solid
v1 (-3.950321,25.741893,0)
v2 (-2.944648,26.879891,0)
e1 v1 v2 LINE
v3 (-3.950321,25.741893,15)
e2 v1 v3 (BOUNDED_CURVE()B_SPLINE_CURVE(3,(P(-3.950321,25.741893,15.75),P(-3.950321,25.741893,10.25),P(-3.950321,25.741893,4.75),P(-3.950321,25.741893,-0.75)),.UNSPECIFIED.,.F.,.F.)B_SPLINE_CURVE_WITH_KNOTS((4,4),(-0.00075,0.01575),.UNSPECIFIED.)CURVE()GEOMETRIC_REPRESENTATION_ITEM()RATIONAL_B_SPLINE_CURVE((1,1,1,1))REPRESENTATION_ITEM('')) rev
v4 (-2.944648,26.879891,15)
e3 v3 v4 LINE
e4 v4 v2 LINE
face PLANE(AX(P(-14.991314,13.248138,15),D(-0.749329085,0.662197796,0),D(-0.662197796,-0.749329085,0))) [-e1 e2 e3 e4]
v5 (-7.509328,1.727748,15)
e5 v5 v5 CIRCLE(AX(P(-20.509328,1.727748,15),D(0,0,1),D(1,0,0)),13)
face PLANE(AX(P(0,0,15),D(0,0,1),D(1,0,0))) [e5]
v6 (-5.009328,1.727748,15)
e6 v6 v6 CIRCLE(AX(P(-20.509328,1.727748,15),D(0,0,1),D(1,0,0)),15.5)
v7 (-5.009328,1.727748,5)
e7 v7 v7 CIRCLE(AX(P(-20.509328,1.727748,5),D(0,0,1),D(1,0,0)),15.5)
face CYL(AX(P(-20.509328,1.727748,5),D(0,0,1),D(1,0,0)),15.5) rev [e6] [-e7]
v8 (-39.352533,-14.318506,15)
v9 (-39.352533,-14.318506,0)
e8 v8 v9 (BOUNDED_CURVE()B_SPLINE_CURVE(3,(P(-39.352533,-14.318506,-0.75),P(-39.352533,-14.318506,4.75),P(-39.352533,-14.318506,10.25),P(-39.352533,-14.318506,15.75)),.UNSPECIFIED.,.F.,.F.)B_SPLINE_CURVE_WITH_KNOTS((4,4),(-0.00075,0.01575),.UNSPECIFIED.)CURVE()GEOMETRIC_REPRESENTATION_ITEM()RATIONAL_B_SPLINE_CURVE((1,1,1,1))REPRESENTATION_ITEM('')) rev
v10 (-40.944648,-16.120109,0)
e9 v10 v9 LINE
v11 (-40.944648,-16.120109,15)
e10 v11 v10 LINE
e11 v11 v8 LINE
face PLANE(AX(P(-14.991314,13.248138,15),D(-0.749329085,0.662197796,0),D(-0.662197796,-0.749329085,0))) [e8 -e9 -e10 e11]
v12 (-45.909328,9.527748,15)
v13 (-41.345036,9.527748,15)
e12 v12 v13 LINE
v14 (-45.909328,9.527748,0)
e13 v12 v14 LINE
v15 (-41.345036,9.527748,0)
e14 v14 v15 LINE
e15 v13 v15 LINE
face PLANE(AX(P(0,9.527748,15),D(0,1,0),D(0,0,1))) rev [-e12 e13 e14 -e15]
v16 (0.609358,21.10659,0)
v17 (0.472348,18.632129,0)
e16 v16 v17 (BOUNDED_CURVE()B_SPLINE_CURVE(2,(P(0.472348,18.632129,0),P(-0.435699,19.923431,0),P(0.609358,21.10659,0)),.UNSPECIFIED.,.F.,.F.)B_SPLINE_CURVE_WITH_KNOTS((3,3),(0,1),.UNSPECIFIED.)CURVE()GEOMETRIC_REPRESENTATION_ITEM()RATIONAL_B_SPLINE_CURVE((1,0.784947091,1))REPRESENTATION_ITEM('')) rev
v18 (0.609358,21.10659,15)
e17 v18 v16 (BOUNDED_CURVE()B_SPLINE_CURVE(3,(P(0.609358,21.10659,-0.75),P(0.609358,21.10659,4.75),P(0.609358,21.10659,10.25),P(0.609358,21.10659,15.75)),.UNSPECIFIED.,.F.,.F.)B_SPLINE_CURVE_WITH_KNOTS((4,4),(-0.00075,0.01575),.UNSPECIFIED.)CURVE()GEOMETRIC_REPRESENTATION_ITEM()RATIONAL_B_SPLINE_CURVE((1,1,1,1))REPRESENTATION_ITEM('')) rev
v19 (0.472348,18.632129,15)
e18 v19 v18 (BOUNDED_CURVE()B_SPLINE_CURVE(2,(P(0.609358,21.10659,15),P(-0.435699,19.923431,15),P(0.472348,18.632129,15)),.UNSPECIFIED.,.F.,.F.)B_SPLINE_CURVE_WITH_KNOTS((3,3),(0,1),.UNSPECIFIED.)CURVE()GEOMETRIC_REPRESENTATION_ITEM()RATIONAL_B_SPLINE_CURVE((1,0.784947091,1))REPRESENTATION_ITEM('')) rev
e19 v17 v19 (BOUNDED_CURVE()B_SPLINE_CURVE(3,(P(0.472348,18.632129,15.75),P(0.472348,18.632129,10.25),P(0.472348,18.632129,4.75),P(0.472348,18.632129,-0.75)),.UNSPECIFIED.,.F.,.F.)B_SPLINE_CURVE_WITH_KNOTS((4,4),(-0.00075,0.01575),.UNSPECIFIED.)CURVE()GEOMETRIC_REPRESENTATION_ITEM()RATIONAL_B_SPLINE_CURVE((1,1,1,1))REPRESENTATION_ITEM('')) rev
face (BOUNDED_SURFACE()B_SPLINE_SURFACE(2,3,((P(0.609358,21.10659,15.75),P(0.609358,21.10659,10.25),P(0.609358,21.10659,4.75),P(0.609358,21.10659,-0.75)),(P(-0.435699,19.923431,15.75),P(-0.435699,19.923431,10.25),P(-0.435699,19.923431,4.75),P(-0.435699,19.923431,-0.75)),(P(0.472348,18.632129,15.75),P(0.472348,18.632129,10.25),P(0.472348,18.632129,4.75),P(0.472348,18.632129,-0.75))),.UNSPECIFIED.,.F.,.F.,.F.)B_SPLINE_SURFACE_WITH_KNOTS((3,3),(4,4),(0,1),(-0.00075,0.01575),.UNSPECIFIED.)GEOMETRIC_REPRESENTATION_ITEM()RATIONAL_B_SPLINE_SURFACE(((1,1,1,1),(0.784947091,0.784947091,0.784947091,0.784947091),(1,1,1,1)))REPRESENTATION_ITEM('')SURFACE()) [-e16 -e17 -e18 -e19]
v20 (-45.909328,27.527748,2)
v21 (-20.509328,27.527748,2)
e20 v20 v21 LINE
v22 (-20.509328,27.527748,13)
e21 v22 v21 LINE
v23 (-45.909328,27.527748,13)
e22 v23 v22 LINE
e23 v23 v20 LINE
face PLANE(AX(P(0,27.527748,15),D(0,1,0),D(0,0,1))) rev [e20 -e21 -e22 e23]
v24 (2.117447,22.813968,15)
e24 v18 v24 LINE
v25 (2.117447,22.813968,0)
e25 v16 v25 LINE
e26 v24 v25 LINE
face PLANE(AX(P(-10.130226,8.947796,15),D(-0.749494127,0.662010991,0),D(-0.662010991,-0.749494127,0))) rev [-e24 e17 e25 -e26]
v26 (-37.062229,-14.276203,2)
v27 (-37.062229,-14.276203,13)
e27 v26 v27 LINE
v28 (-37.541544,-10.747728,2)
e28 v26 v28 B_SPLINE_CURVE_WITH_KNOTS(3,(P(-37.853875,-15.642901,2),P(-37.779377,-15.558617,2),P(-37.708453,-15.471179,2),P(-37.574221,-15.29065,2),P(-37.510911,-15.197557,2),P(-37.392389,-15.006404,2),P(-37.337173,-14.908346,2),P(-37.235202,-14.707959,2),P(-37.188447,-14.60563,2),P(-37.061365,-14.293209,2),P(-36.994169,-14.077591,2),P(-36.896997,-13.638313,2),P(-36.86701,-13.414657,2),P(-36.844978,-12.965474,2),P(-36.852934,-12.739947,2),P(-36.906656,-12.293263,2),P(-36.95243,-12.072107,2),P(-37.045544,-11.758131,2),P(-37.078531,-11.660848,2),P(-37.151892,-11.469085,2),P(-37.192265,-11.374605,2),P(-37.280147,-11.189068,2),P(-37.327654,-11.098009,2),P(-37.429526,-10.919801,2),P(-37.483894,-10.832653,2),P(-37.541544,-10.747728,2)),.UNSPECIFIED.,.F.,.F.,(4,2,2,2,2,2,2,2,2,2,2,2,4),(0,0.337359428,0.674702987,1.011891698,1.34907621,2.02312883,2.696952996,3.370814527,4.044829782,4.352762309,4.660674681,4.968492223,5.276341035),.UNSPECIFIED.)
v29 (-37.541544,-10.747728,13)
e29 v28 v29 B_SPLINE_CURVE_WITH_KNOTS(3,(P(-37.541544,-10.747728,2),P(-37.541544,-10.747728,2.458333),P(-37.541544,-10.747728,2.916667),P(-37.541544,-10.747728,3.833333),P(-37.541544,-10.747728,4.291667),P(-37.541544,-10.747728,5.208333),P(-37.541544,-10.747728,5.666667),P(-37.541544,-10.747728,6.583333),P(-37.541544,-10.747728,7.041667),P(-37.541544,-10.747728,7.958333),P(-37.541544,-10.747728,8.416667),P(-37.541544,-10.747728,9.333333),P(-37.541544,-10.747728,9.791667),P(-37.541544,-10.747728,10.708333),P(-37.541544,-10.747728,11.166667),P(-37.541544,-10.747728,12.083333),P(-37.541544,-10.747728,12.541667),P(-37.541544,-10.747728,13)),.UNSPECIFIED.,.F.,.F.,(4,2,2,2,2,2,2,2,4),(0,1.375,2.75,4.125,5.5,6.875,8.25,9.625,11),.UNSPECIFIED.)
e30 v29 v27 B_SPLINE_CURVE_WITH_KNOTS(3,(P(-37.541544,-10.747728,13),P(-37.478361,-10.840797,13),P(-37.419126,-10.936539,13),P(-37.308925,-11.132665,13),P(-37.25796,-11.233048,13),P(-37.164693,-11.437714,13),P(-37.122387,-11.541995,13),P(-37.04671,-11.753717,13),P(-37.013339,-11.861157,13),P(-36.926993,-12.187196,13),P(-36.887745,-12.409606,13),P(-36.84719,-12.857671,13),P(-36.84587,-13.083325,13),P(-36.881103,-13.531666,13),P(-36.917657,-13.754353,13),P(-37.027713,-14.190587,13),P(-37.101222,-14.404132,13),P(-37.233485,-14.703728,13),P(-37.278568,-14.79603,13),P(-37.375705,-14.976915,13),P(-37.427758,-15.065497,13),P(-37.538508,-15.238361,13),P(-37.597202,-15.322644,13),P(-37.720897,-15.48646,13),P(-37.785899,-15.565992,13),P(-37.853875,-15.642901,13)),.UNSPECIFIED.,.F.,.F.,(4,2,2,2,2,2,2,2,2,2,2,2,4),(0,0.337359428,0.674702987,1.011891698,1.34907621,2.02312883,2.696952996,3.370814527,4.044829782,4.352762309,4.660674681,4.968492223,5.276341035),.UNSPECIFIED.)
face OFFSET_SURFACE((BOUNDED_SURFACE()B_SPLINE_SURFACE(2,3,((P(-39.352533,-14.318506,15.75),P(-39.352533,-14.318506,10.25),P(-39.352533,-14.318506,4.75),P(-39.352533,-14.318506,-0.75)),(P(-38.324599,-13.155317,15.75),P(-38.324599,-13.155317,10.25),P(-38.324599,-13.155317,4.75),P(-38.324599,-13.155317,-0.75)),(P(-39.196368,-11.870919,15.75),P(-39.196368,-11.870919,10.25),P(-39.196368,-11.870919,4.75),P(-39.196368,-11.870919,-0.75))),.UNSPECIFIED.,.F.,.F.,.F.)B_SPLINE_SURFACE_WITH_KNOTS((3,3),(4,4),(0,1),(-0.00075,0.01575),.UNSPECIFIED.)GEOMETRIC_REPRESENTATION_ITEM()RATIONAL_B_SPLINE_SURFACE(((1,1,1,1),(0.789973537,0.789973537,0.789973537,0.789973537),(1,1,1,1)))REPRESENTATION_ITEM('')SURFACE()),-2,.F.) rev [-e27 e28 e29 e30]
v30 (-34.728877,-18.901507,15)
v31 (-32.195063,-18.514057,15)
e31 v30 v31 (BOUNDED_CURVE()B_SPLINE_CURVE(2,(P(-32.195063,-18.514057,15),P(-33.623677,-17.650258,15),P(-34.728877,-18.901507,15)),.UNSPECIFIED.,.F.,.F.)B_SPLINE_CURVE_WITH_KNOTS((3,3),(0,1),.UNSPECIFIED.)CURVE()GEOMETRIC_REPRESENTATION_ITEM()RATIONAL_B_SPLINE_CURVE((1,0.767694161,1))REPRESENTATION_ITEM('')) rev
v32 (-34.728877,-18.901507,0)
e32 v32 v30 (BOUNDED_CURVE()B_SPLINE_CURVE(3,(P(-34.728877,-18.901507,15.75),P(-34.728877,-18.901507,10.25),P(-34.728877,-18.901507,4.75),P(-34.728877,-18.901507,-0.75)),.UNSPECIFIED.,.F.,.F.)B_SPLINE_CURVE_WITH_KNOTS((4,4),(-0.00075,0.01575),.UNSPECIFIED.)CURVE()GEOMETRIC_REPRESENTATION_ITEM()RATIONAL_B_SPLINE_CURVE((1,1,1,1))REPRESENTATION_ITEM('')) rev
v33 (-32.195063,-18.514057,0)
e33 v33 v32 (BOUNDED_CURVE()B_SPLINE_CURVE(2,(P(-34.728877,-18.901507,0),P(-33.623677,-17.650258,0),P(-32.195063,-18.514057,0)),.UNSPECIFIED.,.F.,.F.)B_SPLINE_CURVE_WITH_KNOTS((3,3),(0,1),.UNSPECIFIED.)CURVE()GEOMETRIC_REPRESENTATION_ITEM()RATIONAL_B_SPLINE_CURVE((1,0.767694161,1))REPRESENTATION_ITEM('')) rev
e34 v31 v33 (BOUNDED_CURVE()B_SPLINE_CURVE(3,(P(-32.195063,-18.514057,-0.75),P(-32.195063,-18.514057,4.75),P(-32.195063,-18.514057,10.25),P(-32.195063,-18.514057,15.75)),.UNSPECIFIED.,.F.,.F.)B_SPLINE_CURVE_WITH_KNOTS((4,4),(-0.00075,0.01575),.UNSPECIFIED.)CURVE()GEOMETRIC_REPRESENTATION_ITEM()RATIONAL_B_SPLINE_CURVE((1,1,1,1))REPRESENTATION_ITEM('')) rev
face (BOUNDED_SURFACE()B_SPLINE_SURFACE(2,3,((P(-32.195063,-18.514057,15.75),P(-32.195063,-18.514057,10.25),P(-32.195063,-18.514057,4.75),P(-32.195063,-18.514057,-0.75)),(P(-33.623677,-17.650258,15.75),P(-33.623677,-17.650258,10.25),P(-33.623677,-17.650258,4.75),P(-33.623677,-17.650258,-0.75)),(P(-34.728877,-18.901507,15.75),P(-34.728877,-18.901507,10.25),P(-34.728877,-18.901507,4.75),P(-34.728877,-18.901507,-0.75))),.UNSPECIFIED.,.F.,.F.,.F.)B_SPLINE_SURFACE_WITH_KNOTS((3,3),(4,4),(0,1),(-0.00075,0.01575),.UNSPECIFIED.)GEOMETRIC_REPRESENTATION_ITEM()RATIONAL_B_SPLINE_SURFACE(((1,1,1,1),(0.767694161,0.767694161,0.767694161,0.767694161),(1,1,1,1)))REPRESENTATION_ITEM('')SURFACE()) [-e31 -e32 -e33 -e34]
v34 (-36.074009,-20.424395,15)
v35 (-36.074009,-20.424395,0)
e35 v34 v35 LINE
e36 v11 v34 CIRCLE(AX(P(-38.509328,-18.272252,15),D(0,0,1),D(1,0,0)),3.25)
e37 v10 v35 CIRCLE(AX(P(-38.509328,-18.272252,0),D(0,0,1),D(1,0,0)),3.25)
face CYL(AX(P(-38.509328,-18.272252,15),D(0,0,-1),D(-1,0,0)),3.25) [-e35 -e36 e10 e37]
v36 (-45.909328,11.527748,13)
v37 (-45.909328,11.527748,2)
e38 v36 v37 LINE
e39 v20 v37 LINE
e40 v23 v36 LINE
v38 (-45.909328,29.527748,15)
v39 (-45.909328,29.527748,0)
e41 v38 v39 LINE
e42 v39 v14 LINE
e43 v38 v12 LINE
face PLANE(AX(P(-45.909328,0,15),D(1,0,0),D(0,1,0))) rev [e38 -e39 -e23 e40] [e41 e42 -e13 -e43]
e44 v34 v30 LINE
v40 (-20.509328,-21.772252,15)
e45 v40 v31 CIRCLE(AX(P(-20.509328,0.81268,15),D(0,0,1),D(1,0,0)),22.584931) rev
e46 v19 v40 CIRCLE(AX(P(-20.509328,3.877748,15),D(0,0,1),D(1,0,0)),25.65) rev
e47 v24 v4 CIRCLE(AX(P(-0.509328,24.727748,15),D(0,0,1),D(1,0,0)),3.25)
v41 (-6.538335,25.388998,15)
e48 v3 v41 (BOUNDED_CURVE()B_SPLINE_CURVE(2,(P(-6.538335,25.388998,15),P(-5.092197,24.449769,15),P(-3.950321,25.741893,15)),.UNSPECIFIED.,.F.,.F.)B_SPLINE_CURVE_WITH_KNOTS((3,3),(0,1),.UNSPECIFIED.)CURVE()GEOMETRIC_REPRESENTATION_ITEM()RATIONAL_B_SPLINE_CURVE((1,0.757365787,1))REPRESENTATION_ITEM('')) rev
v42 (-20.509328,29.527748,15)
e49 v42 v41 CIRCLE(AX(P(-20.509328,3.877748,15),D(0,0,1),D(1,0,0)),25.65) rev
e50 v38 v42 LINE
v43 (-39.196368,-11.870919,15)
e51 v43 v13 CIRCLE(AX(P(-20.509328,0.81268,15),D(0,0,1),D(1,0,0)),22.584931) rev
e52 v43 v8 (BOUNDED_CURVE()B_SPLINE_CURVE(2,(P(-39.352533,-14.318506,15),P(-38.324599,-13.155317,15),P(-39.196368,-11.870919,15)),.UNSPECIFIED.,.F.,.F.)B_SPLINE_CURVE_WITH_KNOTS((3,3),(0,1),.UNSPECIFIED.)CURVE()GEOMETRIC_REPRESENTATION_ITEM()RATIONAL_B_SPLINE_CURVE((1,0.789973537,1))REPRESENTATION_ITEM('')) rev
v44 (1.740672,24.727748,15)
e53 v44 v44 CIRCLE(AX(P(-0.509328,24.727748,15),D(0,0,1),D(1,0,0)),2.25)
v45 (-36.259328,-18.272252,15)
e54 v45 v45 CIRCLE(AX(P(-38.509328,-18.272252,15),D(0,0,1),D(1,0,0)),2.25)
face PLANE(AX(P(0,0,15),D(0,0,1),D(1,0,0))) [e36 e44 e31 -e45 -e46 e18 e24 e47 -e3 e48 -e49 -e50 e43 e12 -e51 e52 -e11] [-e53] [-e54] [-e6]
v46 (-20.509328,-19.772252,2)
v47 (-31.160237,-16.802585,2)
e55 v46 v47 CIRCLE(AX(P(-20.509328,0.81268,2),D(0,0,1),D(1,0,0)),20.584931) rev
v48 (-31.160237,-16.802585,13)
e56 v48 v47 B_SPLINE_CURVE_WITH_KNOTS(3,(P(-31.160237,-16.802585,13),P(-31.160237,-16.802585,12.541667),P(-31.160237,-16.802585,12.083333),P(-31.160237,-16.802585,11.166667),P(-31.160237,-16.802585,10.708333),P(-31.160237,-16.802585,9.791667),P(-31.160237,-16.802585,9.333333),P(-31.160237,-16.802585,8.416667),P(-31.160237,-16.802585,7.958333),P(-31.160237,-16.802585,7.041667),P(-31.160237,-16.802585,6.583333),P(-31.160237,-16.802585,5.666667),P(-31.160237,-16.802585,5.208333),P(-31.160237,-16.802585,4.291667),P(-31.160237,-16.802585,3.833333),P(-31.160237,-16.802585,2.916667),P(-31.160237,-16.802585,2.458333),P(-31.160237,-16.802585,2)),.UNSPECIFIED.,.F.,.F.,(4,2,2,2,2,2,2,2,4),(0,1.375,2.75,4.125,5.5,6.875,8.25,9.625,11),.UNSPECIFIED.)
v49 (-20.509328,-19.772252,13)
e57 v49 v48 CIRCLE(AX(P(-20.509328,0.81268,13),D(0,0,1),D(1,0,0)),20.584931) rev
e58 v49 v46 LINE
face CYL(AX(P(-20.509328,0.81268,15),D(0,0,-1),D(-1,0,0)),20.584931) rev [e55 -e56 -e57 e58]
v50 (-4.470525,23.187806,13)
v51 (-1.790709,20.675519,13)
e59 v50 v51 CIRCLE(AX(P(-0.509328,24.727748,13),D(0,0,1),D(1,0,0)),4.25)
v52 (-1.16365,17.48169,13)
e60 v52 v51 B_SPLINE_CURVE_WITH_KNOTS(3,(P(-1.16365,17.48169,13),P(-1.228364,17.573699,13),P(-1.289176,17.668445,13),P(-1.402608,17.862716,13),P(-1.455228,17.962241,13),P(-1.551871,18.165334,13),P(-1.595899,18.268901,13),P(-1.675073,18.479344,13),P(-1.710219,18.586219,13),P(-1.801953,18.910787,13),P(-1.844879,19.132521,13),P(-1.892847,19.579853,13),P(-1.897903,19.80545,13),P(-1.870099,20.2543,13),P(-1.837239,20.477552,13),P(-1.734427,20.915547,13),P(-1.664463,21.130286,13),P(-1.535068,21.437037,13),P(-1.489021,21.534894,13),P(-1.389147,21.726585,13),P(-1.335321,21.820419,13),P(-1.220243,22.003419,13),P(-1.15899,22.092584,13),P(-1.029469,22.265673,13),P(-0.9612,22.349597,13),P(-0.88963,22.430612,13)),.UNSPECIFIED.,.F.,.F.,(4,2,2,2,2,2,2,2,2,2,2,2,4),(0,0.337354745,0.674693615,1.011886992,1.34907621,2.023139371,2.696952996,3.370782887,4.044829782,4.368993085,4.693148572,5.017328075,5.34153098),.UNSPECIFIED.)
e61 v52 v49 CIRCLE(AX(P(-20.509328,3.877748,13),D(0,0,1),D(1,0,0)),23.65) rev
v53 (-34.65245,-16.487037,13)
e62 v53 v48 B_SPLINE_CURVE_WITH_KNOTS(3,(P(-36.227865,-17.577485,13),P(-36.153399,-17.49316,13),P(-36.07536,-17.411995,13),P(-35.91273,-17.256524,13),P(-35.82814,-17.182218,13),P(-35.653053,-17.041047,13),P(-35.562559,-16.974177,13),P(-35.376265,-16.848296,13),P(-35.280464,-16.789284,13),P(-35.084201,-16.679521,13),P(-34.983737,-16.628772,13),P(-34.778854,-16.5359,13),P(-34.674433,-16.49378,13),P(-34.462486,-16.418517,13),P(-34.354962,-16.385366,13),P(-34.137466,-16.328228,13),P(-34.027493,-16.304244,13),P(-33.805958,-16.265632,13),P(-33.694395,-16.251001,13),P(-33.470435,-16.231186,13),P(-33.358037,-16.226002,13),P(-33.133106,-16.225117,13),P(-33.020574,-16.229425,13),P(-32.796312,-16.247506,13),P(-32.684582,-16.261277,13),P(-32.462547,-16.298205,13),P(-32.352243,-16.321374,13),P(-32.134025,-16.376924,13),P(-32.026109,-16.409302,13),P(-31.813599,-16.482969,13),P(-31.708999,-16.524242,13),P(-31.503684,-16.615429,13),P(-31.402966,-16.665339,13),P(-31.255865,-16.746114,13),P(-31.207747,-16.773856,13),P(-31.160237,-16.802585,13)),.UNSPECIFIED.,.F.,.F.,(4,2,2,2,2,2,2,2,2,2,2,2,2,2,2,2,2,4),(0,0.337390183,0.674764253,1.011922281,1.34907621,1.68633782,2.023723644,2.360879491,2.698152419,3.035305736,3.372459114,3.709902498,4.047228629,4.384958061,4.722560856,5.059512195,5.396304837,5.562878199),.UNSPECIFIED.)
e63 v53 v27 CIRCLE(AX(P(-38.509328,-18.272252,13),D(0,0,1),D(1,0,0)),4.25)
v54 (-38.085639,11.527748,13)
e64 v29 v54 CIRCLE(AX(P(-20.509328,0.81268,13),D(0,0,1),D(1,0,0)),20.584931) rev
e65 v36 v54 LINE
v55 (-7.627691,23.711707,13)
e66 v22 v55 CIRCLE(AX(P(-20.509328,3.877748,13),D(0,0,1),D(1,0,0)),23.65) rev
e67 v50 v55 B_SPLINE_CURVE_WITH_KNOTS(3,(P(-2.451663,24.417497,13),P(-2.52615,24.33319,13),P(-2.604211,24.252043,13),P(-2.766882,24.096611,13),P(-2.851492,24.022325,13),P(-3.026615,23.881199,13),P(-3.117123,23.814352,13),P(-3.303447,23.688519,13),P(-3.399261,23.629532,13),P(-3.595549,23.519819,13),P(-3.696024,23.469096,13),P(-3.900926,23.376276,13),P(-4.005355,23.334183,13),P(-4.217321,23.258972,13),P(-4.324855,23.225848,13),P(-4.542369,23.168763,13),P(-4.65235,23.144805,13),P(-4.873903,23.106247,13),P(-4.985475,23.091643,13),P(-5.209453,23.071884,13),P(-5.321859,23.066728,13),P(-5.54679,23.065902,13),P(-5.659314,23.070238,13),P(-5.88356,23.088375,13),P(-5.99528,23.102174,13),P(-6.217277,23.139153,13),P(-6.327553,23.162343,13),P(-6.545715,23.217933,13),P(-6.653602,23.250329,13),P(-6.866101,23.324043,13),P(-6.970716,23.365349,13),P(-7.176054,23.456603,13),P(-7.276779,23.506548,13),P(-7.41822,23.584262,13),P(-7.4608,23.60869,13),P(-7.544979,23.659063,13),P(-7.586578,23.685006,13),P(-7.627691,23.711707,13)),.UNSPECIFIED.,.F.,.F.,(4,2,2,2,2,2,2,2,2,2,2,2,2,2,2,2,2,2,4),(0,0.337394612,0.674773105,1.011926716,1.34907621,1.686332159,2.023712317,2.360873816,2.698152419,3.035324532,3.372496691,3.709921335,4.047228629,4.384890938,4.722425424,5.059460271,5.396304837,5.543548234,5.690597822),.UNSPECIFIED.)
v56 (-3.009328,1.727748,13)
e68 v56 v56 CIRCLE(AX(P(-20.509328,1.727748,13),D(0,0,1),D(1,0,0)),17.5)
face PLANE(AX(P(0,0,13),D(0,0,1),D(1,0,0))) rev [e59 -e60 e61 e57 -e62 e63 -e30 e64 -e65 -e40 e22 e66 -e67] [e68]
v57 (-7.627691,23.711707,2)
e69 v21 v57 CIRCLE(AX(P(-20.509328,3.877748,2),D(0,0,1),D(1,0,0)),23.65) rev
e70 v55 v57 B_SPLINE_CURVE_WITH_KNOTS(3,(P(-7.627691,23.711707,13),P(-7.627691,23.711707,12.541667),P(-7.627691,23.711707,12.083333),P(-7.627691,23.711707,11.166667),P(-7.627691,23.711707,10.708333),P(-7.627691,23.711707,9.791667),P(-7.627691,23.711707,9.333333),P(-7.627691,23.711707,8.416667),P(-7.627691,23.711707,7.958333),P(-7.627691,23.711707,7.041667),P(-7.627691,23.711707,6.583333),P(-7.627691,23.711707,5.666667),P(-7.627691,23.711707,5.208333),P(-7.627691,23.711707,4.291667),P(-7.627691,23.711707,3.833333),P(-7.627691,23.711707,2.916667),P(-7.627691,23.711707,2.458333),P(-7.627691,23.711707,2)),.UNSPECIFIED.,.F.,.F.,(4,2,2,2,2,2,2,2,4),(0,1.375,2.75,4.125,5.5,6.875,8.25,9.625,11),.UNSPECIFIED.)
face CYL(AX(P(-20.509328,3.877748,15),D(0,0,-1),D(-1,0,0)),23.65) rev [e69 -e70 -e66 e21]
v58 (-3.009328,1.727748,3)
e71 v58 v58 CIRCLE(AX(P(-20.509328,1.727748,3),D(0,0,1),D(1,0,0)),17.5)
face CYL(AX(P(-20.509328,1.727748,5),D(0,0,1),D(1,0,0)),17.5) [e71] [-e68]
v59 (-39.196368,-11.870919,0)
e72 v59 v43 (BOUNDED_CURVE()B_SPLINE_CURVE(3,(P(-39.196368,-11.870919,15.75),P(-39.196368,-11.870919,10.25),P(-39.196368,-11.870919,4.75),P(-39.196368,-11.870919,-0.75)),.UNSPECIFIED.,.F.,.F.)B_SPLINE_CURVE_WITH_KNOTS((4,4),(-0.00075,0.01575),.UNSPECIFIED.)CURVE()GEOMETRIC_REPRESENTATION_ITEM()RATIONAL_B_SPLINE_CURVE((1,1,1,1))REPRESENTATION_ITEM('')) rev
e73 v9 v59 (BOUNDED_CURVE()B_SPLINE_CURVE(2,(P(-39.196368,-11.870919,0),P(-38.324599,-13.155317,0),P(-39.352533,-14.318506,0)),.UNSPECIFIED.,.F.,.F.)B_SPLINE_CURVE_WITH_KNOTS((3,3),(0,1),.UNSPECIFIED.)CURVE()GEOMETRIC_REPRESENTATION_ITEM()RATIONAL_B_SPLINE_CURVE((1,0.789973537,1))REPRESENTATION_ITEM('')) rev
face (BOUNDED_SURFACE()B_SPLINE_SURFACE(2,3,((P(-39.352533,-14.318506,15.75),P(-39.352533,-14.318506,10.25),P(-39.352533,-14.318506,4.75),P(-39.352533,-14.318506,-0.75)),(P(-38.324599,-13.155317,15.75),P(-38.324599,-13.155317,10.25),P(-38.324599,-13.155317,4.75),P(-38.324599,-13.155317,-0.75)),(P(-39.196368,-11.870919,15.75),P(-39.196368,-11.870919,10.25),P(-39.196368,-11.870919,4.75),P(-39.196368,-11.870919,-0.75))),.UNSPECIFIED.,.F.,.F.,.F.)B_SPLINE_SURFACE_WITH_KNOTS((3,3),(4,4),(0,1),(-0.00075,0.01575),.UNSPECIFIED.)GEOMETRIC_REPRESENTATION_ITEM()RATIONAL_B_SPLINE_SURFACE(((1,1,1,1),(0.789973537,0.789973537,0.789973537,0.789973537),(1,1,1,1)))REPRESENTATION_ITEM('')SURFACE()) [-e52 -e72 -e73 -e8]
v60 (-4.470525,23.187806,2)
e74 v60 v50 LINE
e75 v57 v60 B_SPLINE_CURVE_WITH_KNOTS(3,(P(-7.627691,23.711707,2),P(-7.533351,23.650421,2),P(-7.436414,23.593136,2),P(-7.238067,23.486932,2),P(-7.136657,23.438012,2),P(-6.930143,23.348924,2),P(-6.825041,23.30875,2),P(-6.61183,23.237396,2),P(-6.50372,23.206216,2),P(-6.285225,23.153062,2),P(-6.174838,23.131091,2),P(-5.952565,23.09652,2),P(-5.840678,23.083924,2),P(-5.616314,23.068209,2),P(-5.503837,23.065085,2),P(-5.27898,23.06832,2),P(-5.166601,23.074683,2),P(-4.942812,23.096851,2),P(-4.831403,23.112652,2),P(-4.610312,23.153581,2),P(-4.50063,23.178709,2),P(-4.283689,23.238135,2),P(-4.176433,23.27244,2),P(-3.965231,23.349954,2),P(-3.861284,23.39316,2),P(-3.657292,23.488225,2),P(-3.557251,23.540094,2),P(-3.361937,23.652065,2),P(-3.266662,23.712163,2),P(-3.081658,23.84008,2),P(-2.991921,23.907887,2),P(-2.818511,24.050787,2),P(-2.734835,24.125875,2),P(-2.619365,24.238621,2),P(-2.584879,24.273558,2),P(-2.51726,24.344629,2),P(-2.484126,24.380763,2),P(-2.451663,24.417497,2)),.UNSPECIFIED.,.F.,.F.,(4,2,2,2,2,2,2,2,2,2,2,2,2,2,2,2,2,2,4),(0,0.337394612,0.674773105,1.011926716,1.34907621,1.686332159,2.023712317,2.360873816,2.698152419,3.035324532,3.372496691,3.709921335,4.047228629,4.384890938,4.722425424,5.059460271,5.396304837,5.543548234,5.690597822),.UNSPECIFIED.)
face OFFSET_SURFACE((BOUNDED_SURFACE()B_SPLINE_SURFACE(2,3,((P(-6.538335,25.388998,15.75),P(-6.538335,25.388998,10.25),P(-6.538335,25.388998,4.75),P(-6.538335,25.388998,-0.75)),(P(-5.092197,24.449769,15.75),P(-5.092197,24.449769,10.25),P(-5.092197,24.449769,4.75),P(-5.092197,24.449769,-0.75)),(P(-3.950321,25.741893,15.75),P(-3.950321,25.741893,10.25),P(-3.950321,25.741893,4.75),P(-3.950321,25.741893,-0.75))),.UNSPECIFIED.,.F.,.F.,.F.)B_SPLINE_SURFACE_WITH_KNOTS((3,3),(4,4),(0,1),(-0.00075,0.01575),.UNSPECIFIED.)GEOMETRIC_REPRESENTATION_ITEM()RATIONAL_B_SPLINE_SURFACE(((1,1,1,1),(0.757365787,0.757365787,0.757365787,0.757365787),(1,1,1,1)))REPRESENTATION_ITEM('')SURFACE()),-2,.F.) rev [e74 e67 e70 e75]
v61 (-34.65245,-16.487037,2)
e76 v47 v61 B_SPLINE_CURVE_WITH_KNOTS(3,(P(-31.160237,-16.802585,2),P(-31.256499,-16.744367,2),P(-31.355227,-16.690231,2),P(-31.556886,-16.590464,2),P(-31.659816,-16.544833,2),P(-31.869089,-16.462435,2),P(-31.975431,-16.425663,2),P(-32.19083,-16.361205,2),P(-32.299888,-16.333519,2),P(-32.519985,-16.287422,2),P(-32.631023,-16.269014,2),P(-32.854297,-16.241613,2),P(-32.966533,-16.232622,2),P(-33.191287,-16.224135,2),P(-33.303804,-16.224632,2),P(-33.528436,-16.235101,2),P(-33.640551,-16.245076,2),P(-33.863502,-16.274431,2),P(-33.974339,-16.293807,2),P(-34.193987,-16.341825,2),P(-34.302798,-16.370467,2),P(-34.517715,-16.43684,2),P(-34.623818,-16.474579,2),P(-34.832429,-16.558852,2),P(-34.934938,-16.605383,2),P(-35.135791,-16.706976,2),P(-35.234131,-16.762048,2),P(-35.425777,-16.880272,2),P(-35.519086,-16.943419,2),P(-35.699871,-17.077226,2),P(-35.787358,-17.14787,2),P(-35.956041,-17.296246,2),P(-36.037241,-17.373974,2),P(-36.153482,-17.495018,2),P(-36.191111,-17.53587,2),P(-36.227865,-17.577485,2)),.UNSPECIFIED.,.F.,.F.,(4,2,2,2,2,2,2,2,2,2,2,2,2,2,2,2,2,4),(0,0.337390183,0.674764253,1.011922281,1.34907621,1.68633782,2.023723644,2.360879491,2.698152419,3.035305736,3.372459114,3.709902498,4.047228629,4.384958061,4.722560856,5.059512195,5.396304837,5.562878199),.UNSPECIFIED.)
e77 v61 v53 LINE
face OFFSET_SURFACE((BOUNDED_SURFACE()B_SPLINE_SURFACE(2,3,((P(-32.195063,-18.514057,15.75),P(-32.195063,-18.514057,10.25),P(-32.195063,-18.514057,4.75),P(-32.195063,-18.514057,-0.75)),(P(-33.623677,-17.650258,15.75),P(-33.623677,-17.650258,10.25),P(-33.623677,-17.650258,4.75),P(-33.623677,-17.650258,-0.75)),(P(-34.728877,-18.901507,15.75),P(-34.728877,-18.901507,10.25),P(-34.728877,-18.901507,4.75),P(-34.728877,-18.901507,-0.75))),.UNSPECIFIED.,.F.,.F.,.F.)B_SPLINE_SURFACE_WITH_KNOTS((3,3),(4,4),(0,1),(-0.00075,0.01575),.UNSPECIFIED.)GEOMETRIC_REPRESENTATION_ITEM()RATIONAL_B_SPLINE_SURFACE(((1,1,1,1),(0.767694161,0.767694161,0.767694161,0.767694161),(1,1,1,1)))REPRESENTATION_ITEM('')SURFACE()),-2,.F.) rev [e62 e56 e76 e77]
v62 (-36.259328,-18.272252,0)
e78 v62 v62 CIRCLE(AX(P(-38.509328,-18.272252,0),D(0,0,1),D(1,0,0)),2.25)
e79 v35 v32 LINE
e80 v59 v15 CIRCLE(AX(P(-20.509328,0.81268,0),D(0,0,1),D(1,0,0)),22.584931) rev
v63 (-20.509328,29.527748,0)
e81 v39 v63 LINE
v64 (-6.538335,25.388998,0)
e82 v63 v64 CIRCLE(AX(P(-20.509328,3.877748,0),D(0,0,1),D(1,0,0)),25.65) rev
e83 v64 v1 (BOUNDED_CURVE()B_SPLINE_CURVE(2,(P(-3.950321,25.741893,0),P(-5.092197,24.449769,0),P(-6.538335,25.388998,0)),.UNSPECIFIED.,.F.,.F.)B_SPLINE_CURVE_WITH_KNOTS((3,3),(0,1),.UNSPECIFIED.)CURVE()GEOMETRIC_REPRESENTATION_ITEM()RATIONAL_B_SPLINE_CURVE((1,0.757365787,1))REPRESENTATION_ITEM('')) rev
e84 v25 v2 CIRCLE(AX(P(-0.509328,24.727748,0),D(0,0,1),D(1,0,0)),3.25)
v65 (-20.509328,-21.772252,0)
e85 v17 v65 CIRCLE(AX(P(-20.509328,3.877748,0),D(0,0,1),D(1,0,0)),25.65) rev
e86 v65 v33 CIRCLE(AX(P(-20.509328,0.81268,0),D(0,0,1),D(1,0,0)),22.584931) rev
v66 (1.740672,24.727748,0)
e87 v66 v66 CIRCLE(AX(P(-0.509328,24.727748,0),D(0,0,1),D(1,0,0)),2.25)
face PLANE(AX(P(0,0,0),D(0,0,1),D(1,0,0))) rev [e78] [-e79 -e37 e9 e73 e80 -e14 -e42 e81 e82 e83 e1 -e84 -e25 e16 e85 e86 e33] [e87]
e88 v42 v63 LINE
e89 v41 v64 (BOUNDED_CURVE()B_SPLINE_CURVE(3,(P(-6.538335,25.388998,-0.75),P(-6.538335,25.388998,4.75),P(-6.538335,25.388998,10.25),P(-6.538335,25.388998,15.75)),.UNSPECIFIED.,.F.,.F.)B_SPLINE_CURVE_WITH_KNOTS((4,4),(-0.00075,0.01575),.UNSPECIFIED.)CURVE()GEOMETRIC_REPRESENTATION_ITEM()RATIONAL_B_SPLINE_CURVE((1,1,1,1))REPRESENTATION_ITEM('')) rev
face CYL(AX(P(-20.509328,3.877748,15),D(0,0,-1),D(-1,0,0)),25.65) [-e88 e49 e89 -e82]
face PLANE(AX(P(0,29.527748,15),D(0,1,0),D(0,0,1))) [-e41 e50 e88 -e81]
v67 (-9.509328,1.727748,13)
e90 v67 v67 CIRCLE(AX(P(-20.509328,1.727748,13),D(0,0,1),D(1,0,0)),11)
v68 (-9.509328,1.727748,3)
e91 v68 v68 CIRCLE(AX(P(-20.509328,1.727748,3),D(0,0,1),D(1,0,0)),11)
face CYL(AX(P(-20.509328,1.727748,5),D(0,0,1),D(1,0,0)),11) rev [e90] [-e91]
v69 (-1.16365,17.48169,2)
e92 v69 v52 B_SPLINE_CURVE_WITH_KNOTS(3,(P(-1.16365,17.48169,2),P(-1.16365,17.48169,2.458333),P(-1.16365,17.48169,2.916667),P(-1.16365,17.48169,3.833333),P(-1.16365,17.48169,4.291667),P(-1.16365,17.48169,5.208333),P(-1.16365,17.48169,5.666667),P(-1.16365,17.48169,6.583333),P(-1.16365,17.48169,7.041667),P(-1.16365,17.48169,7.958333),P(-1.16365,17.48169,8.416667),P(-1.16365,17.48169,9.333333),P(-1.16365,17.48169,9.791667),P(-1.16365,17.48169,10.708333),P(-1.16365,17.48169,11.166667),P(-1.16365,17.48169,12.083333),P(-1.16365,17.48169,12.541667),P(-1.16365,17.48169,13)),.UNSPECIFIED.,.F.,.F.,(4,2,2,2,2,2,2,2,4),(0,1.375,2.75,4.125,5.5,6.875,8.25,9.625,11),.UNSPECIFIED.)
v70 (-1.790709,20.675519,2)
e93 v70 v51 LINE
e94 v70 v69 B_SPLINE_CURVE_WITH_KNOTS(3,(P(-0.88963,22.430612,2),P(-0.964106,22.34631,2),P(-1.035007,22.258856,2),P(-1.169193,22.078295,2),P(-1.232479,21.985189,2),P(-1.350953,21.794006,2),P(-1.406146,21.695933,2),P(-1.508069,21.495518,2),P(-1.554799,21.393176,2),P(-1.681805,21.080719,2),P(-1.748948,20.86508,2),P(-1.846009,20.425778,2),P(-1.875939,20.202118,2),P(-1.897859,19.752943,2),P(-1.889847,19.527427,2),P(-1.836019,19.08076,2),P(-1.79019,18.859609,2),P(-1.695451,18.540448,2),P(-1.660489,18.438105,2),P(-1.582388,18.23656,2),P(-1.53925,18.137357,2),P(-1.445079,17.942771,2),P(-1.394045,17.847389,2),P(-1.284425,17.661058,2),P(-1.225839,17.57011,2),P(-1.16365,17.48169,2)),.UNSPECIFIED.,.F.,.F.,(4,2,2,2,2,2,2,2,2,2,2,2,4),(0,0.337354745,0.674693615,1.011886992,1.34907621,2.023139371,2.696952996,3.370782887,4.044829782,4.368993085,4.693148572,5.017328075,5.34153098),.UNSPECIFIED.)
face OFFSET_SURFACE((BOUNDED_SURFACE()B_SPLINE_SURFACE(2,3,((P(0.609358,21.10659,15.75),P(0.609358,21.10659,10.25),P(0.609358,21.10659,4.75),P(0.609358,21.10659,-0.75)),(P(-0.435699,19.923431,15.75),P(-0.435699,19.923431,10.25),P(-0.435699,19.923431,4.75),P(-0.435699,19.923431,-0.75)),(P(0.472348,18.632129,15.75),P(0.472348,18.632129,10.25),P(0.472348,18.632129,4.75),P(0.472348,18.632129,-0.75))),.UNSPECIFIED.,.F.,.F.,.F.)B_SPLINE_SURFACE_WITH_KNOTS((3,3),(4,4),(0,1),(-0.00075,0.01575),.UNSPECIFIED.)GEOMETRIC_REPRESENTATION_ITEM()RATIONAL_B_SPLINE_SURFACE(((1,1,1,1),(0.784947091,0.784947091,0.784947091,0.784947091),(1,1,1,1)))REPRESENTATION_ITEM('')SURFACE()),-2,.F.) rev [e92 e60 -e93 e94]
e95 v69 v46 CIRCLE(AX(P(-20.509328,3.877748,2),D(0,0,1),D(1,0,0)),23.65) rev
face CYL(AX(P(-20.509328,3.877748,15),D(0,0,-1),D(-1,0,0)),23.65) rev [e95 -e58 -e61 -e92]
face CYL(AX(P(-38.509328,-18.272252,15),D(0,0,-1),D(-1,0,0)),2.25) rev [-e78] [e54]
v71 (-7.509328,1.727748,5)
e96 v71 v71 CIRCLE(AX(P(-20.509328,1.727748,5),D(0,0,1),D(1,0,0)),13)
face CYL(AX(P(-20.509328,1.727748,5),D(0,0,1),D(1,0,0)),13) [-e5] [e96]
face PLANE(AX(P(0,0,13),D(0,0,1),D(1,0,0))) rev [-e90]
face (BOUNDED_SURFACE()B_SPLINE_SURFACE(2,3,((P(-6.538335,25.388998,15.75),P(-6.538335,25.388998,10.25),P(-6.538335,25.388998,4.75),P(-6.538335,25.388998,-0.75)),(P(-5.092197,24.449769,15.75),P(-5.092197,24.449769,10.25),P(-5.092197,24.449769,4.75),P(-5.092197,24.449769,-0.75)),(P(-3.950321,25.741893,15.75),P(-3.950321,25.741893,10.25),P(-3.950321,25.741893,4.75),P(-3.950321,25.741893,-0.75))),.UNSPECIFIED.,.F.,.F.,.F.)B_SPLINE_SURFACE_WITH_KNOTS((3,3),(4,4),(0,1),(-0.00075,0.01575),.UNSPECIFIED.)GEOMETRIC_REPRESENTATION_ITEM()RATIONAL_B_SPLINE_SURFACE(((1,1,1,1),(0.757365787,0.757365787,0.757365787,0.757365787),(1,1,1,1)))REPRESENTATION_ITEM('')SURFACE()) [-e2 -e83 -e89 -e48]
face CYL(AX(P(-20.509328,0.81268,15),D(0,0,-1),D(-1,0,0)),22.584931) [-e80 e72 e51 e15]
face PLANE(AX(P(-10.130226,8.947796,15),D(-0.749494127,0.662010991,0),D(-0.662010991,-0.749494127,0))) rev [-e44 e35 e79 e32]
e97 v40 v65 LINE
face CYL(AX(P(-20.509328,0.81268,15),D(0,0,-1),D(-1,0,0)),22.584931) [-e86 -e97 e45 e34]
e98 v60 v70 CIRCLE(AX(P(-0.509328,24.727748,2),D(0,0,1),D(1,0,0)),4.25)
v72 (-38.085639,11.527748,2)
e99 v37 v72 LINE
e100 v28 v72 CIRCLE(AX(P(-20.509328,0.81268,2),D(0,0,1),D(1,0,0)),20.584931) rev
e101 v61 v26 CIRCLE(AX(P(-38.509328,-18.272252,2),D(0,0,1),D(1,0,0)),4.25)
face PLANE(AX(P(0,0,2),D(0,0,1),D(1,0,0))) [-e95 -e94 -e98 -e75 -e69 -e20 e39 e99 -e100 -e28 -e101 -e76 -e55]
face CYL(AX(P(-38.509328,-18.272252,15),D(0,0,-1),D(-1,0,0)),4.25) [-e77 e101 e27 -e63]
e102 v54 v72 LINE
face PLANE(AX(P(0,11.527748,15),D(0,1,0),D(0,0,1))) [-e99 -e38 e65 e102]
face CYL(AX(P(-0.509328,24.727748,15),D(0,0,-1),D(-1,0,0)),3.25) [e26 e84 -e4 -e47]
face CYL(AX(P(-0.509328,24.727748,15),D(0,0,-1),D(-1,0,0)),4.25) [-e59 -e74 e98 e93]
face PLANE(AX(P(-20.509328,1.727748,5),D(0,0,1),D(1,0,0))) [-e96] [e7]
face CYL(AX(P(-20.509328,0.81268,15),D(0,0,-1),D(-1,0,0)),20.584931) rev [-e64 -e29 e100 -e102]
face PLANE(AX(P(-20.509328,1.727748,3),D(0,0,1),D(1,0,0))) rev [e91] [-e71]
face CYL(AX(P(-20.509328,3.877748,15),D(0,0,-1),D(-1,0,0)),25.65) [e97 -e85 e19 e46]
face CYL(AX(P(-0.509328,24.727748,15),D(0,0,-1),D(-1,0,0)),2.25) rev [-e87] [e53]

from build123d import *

# Parameters (mm, degrees)
SKETCH_1_R          = 2.25
SKETCH_1_R_2        = 13
EXTRUDE_1_DEPTH     = 15
EXTRUDE_START       = -15
SKETCH_2_R          = 13
EXTRUDE_2_DEPTH     = 15
SKETCH_3_R          = 15.5
SKETCH_3_R_2        = 13
CUT_EXTRUDE_1_DEPTH = 10
FILLET_2_R          = 2
SHELL_1_T           = -2


with BuildPart() as part:
    # 草图1 → 凸台-拉伸1 (new body)
    with BuildSketch(Plane.XY):
        with BuildLine():
            Line((-20.509328188, 29.527748201), (-45.909328188, 29.527748201))
            Line((-45.909328188, 29.527748201), (-45.909328188, 9.527748201))
            Line((-45.909328188, 9.527748201), (-41.345035516, 9.527748201))
            ThreePointArc((-41.345035516, 9.527748201), (-42.891279982, -2.208471939), (-38.288719604, -13.114716624))
            Line((-38.288719604, -13.114716624), (-40.944647776, -16.120109029))
            ThreePointArc((-40.944647776, -16.120109029), (-40.661470992, -20.707571357), (-36.07400866, -20.424394637))
            Line((-36.07400866, -20.424394637), (-33.582654856, -17.603814511))
            ThreePointArc((-33.582654856, -17.603814511), (-27.370227174, -20.704922292), (-20.509328188, -21.772251799))
            ThreePointArc((-20.509328188, -21.772251799), (2.605029944, -7.24200666), (-0.468314839, 19.886504679))
            Line((-0.468314839, 19.886504679), (2.117446855, 22.813968467))
            ThreePointArc((2.117446855, 22.813968467), (1.525885658, 27.261599934), (-2.944647715, 26.87989104))
            Line((-2.944647715, 26.87989104), (-5.1306618, 24.406243523))
            ThreePointArc((-5.1306618, 24.406243523), (-12.404804913, 28.213713407), (-20.509328188, 29.527748201))
        make_face()
        with Locations((-38.509328188, -18.272251799)):
            Circle(SKETCH_1_R, mode=Mode.SUBTRACT)
        with Locations((-0.509328188, 24.727748201)):
            Circle(SKETCH_1_R, mode=Mode.SUBTRACT)
        with Locations((-20.509328188, 1.727748201)):
            Circle(SKETCH_1_R_2, mode=Mode.SUBTRACT)
    extrude(amount=EXTRUDE_1_DEPTH)

    # 草图2 → 凸台-拉伸2 (add)
    with BuildSketch(Plane.XY.offset(15).offset(EXTRUDE_START)):
        with Locations((-20.509328188, 1.727748201)):
            Circle(SKETCH_2_R)
    extrude(amount=EXTRUDE_2_DEPTH)

    # 草图3 → 切除-拉伸1 (cut)
    with BuildSketch(Plane.XY.offset(15)):
        with Locations((-20.509328188, 1.727748201)):
            Circle(SKETCH_3_R)
        with Locations((-20.509328188, 1.727748201)):
            Circle(SKETCH_3_R_2, mode=Mode.SUBTRACT)
    extrude(amount=-CUT_EXTRUDE_1_DEPTH, mode=Mode.SUBTRACT)

    # 变化圆角2
    fillet_2_edges = [part.edges().sort_by_distance(p)[0] for p in [
        (-5.1306618, 24.406243523, 7.5),
        (-0.468314839, 19.886504679, 7.5),
        (-38.288719604, -13.114716624, 7.5),
        (-33.582654856, -17.603814511, 7.5),
    ]]
    fillet(fillet_2_edges, radius=FILLET_2_R)

    # 抽壳1
    shell_1_openings = [part.faces().sort_by_distance(p)[0] for p in [
        (-45.909328188, 19.527748201, 7.5),
    ]]
    offset(amount=SHELL_1_T, openings=shell_1_openings, kind=Kind.INTERSECTION)


solid = part.part
